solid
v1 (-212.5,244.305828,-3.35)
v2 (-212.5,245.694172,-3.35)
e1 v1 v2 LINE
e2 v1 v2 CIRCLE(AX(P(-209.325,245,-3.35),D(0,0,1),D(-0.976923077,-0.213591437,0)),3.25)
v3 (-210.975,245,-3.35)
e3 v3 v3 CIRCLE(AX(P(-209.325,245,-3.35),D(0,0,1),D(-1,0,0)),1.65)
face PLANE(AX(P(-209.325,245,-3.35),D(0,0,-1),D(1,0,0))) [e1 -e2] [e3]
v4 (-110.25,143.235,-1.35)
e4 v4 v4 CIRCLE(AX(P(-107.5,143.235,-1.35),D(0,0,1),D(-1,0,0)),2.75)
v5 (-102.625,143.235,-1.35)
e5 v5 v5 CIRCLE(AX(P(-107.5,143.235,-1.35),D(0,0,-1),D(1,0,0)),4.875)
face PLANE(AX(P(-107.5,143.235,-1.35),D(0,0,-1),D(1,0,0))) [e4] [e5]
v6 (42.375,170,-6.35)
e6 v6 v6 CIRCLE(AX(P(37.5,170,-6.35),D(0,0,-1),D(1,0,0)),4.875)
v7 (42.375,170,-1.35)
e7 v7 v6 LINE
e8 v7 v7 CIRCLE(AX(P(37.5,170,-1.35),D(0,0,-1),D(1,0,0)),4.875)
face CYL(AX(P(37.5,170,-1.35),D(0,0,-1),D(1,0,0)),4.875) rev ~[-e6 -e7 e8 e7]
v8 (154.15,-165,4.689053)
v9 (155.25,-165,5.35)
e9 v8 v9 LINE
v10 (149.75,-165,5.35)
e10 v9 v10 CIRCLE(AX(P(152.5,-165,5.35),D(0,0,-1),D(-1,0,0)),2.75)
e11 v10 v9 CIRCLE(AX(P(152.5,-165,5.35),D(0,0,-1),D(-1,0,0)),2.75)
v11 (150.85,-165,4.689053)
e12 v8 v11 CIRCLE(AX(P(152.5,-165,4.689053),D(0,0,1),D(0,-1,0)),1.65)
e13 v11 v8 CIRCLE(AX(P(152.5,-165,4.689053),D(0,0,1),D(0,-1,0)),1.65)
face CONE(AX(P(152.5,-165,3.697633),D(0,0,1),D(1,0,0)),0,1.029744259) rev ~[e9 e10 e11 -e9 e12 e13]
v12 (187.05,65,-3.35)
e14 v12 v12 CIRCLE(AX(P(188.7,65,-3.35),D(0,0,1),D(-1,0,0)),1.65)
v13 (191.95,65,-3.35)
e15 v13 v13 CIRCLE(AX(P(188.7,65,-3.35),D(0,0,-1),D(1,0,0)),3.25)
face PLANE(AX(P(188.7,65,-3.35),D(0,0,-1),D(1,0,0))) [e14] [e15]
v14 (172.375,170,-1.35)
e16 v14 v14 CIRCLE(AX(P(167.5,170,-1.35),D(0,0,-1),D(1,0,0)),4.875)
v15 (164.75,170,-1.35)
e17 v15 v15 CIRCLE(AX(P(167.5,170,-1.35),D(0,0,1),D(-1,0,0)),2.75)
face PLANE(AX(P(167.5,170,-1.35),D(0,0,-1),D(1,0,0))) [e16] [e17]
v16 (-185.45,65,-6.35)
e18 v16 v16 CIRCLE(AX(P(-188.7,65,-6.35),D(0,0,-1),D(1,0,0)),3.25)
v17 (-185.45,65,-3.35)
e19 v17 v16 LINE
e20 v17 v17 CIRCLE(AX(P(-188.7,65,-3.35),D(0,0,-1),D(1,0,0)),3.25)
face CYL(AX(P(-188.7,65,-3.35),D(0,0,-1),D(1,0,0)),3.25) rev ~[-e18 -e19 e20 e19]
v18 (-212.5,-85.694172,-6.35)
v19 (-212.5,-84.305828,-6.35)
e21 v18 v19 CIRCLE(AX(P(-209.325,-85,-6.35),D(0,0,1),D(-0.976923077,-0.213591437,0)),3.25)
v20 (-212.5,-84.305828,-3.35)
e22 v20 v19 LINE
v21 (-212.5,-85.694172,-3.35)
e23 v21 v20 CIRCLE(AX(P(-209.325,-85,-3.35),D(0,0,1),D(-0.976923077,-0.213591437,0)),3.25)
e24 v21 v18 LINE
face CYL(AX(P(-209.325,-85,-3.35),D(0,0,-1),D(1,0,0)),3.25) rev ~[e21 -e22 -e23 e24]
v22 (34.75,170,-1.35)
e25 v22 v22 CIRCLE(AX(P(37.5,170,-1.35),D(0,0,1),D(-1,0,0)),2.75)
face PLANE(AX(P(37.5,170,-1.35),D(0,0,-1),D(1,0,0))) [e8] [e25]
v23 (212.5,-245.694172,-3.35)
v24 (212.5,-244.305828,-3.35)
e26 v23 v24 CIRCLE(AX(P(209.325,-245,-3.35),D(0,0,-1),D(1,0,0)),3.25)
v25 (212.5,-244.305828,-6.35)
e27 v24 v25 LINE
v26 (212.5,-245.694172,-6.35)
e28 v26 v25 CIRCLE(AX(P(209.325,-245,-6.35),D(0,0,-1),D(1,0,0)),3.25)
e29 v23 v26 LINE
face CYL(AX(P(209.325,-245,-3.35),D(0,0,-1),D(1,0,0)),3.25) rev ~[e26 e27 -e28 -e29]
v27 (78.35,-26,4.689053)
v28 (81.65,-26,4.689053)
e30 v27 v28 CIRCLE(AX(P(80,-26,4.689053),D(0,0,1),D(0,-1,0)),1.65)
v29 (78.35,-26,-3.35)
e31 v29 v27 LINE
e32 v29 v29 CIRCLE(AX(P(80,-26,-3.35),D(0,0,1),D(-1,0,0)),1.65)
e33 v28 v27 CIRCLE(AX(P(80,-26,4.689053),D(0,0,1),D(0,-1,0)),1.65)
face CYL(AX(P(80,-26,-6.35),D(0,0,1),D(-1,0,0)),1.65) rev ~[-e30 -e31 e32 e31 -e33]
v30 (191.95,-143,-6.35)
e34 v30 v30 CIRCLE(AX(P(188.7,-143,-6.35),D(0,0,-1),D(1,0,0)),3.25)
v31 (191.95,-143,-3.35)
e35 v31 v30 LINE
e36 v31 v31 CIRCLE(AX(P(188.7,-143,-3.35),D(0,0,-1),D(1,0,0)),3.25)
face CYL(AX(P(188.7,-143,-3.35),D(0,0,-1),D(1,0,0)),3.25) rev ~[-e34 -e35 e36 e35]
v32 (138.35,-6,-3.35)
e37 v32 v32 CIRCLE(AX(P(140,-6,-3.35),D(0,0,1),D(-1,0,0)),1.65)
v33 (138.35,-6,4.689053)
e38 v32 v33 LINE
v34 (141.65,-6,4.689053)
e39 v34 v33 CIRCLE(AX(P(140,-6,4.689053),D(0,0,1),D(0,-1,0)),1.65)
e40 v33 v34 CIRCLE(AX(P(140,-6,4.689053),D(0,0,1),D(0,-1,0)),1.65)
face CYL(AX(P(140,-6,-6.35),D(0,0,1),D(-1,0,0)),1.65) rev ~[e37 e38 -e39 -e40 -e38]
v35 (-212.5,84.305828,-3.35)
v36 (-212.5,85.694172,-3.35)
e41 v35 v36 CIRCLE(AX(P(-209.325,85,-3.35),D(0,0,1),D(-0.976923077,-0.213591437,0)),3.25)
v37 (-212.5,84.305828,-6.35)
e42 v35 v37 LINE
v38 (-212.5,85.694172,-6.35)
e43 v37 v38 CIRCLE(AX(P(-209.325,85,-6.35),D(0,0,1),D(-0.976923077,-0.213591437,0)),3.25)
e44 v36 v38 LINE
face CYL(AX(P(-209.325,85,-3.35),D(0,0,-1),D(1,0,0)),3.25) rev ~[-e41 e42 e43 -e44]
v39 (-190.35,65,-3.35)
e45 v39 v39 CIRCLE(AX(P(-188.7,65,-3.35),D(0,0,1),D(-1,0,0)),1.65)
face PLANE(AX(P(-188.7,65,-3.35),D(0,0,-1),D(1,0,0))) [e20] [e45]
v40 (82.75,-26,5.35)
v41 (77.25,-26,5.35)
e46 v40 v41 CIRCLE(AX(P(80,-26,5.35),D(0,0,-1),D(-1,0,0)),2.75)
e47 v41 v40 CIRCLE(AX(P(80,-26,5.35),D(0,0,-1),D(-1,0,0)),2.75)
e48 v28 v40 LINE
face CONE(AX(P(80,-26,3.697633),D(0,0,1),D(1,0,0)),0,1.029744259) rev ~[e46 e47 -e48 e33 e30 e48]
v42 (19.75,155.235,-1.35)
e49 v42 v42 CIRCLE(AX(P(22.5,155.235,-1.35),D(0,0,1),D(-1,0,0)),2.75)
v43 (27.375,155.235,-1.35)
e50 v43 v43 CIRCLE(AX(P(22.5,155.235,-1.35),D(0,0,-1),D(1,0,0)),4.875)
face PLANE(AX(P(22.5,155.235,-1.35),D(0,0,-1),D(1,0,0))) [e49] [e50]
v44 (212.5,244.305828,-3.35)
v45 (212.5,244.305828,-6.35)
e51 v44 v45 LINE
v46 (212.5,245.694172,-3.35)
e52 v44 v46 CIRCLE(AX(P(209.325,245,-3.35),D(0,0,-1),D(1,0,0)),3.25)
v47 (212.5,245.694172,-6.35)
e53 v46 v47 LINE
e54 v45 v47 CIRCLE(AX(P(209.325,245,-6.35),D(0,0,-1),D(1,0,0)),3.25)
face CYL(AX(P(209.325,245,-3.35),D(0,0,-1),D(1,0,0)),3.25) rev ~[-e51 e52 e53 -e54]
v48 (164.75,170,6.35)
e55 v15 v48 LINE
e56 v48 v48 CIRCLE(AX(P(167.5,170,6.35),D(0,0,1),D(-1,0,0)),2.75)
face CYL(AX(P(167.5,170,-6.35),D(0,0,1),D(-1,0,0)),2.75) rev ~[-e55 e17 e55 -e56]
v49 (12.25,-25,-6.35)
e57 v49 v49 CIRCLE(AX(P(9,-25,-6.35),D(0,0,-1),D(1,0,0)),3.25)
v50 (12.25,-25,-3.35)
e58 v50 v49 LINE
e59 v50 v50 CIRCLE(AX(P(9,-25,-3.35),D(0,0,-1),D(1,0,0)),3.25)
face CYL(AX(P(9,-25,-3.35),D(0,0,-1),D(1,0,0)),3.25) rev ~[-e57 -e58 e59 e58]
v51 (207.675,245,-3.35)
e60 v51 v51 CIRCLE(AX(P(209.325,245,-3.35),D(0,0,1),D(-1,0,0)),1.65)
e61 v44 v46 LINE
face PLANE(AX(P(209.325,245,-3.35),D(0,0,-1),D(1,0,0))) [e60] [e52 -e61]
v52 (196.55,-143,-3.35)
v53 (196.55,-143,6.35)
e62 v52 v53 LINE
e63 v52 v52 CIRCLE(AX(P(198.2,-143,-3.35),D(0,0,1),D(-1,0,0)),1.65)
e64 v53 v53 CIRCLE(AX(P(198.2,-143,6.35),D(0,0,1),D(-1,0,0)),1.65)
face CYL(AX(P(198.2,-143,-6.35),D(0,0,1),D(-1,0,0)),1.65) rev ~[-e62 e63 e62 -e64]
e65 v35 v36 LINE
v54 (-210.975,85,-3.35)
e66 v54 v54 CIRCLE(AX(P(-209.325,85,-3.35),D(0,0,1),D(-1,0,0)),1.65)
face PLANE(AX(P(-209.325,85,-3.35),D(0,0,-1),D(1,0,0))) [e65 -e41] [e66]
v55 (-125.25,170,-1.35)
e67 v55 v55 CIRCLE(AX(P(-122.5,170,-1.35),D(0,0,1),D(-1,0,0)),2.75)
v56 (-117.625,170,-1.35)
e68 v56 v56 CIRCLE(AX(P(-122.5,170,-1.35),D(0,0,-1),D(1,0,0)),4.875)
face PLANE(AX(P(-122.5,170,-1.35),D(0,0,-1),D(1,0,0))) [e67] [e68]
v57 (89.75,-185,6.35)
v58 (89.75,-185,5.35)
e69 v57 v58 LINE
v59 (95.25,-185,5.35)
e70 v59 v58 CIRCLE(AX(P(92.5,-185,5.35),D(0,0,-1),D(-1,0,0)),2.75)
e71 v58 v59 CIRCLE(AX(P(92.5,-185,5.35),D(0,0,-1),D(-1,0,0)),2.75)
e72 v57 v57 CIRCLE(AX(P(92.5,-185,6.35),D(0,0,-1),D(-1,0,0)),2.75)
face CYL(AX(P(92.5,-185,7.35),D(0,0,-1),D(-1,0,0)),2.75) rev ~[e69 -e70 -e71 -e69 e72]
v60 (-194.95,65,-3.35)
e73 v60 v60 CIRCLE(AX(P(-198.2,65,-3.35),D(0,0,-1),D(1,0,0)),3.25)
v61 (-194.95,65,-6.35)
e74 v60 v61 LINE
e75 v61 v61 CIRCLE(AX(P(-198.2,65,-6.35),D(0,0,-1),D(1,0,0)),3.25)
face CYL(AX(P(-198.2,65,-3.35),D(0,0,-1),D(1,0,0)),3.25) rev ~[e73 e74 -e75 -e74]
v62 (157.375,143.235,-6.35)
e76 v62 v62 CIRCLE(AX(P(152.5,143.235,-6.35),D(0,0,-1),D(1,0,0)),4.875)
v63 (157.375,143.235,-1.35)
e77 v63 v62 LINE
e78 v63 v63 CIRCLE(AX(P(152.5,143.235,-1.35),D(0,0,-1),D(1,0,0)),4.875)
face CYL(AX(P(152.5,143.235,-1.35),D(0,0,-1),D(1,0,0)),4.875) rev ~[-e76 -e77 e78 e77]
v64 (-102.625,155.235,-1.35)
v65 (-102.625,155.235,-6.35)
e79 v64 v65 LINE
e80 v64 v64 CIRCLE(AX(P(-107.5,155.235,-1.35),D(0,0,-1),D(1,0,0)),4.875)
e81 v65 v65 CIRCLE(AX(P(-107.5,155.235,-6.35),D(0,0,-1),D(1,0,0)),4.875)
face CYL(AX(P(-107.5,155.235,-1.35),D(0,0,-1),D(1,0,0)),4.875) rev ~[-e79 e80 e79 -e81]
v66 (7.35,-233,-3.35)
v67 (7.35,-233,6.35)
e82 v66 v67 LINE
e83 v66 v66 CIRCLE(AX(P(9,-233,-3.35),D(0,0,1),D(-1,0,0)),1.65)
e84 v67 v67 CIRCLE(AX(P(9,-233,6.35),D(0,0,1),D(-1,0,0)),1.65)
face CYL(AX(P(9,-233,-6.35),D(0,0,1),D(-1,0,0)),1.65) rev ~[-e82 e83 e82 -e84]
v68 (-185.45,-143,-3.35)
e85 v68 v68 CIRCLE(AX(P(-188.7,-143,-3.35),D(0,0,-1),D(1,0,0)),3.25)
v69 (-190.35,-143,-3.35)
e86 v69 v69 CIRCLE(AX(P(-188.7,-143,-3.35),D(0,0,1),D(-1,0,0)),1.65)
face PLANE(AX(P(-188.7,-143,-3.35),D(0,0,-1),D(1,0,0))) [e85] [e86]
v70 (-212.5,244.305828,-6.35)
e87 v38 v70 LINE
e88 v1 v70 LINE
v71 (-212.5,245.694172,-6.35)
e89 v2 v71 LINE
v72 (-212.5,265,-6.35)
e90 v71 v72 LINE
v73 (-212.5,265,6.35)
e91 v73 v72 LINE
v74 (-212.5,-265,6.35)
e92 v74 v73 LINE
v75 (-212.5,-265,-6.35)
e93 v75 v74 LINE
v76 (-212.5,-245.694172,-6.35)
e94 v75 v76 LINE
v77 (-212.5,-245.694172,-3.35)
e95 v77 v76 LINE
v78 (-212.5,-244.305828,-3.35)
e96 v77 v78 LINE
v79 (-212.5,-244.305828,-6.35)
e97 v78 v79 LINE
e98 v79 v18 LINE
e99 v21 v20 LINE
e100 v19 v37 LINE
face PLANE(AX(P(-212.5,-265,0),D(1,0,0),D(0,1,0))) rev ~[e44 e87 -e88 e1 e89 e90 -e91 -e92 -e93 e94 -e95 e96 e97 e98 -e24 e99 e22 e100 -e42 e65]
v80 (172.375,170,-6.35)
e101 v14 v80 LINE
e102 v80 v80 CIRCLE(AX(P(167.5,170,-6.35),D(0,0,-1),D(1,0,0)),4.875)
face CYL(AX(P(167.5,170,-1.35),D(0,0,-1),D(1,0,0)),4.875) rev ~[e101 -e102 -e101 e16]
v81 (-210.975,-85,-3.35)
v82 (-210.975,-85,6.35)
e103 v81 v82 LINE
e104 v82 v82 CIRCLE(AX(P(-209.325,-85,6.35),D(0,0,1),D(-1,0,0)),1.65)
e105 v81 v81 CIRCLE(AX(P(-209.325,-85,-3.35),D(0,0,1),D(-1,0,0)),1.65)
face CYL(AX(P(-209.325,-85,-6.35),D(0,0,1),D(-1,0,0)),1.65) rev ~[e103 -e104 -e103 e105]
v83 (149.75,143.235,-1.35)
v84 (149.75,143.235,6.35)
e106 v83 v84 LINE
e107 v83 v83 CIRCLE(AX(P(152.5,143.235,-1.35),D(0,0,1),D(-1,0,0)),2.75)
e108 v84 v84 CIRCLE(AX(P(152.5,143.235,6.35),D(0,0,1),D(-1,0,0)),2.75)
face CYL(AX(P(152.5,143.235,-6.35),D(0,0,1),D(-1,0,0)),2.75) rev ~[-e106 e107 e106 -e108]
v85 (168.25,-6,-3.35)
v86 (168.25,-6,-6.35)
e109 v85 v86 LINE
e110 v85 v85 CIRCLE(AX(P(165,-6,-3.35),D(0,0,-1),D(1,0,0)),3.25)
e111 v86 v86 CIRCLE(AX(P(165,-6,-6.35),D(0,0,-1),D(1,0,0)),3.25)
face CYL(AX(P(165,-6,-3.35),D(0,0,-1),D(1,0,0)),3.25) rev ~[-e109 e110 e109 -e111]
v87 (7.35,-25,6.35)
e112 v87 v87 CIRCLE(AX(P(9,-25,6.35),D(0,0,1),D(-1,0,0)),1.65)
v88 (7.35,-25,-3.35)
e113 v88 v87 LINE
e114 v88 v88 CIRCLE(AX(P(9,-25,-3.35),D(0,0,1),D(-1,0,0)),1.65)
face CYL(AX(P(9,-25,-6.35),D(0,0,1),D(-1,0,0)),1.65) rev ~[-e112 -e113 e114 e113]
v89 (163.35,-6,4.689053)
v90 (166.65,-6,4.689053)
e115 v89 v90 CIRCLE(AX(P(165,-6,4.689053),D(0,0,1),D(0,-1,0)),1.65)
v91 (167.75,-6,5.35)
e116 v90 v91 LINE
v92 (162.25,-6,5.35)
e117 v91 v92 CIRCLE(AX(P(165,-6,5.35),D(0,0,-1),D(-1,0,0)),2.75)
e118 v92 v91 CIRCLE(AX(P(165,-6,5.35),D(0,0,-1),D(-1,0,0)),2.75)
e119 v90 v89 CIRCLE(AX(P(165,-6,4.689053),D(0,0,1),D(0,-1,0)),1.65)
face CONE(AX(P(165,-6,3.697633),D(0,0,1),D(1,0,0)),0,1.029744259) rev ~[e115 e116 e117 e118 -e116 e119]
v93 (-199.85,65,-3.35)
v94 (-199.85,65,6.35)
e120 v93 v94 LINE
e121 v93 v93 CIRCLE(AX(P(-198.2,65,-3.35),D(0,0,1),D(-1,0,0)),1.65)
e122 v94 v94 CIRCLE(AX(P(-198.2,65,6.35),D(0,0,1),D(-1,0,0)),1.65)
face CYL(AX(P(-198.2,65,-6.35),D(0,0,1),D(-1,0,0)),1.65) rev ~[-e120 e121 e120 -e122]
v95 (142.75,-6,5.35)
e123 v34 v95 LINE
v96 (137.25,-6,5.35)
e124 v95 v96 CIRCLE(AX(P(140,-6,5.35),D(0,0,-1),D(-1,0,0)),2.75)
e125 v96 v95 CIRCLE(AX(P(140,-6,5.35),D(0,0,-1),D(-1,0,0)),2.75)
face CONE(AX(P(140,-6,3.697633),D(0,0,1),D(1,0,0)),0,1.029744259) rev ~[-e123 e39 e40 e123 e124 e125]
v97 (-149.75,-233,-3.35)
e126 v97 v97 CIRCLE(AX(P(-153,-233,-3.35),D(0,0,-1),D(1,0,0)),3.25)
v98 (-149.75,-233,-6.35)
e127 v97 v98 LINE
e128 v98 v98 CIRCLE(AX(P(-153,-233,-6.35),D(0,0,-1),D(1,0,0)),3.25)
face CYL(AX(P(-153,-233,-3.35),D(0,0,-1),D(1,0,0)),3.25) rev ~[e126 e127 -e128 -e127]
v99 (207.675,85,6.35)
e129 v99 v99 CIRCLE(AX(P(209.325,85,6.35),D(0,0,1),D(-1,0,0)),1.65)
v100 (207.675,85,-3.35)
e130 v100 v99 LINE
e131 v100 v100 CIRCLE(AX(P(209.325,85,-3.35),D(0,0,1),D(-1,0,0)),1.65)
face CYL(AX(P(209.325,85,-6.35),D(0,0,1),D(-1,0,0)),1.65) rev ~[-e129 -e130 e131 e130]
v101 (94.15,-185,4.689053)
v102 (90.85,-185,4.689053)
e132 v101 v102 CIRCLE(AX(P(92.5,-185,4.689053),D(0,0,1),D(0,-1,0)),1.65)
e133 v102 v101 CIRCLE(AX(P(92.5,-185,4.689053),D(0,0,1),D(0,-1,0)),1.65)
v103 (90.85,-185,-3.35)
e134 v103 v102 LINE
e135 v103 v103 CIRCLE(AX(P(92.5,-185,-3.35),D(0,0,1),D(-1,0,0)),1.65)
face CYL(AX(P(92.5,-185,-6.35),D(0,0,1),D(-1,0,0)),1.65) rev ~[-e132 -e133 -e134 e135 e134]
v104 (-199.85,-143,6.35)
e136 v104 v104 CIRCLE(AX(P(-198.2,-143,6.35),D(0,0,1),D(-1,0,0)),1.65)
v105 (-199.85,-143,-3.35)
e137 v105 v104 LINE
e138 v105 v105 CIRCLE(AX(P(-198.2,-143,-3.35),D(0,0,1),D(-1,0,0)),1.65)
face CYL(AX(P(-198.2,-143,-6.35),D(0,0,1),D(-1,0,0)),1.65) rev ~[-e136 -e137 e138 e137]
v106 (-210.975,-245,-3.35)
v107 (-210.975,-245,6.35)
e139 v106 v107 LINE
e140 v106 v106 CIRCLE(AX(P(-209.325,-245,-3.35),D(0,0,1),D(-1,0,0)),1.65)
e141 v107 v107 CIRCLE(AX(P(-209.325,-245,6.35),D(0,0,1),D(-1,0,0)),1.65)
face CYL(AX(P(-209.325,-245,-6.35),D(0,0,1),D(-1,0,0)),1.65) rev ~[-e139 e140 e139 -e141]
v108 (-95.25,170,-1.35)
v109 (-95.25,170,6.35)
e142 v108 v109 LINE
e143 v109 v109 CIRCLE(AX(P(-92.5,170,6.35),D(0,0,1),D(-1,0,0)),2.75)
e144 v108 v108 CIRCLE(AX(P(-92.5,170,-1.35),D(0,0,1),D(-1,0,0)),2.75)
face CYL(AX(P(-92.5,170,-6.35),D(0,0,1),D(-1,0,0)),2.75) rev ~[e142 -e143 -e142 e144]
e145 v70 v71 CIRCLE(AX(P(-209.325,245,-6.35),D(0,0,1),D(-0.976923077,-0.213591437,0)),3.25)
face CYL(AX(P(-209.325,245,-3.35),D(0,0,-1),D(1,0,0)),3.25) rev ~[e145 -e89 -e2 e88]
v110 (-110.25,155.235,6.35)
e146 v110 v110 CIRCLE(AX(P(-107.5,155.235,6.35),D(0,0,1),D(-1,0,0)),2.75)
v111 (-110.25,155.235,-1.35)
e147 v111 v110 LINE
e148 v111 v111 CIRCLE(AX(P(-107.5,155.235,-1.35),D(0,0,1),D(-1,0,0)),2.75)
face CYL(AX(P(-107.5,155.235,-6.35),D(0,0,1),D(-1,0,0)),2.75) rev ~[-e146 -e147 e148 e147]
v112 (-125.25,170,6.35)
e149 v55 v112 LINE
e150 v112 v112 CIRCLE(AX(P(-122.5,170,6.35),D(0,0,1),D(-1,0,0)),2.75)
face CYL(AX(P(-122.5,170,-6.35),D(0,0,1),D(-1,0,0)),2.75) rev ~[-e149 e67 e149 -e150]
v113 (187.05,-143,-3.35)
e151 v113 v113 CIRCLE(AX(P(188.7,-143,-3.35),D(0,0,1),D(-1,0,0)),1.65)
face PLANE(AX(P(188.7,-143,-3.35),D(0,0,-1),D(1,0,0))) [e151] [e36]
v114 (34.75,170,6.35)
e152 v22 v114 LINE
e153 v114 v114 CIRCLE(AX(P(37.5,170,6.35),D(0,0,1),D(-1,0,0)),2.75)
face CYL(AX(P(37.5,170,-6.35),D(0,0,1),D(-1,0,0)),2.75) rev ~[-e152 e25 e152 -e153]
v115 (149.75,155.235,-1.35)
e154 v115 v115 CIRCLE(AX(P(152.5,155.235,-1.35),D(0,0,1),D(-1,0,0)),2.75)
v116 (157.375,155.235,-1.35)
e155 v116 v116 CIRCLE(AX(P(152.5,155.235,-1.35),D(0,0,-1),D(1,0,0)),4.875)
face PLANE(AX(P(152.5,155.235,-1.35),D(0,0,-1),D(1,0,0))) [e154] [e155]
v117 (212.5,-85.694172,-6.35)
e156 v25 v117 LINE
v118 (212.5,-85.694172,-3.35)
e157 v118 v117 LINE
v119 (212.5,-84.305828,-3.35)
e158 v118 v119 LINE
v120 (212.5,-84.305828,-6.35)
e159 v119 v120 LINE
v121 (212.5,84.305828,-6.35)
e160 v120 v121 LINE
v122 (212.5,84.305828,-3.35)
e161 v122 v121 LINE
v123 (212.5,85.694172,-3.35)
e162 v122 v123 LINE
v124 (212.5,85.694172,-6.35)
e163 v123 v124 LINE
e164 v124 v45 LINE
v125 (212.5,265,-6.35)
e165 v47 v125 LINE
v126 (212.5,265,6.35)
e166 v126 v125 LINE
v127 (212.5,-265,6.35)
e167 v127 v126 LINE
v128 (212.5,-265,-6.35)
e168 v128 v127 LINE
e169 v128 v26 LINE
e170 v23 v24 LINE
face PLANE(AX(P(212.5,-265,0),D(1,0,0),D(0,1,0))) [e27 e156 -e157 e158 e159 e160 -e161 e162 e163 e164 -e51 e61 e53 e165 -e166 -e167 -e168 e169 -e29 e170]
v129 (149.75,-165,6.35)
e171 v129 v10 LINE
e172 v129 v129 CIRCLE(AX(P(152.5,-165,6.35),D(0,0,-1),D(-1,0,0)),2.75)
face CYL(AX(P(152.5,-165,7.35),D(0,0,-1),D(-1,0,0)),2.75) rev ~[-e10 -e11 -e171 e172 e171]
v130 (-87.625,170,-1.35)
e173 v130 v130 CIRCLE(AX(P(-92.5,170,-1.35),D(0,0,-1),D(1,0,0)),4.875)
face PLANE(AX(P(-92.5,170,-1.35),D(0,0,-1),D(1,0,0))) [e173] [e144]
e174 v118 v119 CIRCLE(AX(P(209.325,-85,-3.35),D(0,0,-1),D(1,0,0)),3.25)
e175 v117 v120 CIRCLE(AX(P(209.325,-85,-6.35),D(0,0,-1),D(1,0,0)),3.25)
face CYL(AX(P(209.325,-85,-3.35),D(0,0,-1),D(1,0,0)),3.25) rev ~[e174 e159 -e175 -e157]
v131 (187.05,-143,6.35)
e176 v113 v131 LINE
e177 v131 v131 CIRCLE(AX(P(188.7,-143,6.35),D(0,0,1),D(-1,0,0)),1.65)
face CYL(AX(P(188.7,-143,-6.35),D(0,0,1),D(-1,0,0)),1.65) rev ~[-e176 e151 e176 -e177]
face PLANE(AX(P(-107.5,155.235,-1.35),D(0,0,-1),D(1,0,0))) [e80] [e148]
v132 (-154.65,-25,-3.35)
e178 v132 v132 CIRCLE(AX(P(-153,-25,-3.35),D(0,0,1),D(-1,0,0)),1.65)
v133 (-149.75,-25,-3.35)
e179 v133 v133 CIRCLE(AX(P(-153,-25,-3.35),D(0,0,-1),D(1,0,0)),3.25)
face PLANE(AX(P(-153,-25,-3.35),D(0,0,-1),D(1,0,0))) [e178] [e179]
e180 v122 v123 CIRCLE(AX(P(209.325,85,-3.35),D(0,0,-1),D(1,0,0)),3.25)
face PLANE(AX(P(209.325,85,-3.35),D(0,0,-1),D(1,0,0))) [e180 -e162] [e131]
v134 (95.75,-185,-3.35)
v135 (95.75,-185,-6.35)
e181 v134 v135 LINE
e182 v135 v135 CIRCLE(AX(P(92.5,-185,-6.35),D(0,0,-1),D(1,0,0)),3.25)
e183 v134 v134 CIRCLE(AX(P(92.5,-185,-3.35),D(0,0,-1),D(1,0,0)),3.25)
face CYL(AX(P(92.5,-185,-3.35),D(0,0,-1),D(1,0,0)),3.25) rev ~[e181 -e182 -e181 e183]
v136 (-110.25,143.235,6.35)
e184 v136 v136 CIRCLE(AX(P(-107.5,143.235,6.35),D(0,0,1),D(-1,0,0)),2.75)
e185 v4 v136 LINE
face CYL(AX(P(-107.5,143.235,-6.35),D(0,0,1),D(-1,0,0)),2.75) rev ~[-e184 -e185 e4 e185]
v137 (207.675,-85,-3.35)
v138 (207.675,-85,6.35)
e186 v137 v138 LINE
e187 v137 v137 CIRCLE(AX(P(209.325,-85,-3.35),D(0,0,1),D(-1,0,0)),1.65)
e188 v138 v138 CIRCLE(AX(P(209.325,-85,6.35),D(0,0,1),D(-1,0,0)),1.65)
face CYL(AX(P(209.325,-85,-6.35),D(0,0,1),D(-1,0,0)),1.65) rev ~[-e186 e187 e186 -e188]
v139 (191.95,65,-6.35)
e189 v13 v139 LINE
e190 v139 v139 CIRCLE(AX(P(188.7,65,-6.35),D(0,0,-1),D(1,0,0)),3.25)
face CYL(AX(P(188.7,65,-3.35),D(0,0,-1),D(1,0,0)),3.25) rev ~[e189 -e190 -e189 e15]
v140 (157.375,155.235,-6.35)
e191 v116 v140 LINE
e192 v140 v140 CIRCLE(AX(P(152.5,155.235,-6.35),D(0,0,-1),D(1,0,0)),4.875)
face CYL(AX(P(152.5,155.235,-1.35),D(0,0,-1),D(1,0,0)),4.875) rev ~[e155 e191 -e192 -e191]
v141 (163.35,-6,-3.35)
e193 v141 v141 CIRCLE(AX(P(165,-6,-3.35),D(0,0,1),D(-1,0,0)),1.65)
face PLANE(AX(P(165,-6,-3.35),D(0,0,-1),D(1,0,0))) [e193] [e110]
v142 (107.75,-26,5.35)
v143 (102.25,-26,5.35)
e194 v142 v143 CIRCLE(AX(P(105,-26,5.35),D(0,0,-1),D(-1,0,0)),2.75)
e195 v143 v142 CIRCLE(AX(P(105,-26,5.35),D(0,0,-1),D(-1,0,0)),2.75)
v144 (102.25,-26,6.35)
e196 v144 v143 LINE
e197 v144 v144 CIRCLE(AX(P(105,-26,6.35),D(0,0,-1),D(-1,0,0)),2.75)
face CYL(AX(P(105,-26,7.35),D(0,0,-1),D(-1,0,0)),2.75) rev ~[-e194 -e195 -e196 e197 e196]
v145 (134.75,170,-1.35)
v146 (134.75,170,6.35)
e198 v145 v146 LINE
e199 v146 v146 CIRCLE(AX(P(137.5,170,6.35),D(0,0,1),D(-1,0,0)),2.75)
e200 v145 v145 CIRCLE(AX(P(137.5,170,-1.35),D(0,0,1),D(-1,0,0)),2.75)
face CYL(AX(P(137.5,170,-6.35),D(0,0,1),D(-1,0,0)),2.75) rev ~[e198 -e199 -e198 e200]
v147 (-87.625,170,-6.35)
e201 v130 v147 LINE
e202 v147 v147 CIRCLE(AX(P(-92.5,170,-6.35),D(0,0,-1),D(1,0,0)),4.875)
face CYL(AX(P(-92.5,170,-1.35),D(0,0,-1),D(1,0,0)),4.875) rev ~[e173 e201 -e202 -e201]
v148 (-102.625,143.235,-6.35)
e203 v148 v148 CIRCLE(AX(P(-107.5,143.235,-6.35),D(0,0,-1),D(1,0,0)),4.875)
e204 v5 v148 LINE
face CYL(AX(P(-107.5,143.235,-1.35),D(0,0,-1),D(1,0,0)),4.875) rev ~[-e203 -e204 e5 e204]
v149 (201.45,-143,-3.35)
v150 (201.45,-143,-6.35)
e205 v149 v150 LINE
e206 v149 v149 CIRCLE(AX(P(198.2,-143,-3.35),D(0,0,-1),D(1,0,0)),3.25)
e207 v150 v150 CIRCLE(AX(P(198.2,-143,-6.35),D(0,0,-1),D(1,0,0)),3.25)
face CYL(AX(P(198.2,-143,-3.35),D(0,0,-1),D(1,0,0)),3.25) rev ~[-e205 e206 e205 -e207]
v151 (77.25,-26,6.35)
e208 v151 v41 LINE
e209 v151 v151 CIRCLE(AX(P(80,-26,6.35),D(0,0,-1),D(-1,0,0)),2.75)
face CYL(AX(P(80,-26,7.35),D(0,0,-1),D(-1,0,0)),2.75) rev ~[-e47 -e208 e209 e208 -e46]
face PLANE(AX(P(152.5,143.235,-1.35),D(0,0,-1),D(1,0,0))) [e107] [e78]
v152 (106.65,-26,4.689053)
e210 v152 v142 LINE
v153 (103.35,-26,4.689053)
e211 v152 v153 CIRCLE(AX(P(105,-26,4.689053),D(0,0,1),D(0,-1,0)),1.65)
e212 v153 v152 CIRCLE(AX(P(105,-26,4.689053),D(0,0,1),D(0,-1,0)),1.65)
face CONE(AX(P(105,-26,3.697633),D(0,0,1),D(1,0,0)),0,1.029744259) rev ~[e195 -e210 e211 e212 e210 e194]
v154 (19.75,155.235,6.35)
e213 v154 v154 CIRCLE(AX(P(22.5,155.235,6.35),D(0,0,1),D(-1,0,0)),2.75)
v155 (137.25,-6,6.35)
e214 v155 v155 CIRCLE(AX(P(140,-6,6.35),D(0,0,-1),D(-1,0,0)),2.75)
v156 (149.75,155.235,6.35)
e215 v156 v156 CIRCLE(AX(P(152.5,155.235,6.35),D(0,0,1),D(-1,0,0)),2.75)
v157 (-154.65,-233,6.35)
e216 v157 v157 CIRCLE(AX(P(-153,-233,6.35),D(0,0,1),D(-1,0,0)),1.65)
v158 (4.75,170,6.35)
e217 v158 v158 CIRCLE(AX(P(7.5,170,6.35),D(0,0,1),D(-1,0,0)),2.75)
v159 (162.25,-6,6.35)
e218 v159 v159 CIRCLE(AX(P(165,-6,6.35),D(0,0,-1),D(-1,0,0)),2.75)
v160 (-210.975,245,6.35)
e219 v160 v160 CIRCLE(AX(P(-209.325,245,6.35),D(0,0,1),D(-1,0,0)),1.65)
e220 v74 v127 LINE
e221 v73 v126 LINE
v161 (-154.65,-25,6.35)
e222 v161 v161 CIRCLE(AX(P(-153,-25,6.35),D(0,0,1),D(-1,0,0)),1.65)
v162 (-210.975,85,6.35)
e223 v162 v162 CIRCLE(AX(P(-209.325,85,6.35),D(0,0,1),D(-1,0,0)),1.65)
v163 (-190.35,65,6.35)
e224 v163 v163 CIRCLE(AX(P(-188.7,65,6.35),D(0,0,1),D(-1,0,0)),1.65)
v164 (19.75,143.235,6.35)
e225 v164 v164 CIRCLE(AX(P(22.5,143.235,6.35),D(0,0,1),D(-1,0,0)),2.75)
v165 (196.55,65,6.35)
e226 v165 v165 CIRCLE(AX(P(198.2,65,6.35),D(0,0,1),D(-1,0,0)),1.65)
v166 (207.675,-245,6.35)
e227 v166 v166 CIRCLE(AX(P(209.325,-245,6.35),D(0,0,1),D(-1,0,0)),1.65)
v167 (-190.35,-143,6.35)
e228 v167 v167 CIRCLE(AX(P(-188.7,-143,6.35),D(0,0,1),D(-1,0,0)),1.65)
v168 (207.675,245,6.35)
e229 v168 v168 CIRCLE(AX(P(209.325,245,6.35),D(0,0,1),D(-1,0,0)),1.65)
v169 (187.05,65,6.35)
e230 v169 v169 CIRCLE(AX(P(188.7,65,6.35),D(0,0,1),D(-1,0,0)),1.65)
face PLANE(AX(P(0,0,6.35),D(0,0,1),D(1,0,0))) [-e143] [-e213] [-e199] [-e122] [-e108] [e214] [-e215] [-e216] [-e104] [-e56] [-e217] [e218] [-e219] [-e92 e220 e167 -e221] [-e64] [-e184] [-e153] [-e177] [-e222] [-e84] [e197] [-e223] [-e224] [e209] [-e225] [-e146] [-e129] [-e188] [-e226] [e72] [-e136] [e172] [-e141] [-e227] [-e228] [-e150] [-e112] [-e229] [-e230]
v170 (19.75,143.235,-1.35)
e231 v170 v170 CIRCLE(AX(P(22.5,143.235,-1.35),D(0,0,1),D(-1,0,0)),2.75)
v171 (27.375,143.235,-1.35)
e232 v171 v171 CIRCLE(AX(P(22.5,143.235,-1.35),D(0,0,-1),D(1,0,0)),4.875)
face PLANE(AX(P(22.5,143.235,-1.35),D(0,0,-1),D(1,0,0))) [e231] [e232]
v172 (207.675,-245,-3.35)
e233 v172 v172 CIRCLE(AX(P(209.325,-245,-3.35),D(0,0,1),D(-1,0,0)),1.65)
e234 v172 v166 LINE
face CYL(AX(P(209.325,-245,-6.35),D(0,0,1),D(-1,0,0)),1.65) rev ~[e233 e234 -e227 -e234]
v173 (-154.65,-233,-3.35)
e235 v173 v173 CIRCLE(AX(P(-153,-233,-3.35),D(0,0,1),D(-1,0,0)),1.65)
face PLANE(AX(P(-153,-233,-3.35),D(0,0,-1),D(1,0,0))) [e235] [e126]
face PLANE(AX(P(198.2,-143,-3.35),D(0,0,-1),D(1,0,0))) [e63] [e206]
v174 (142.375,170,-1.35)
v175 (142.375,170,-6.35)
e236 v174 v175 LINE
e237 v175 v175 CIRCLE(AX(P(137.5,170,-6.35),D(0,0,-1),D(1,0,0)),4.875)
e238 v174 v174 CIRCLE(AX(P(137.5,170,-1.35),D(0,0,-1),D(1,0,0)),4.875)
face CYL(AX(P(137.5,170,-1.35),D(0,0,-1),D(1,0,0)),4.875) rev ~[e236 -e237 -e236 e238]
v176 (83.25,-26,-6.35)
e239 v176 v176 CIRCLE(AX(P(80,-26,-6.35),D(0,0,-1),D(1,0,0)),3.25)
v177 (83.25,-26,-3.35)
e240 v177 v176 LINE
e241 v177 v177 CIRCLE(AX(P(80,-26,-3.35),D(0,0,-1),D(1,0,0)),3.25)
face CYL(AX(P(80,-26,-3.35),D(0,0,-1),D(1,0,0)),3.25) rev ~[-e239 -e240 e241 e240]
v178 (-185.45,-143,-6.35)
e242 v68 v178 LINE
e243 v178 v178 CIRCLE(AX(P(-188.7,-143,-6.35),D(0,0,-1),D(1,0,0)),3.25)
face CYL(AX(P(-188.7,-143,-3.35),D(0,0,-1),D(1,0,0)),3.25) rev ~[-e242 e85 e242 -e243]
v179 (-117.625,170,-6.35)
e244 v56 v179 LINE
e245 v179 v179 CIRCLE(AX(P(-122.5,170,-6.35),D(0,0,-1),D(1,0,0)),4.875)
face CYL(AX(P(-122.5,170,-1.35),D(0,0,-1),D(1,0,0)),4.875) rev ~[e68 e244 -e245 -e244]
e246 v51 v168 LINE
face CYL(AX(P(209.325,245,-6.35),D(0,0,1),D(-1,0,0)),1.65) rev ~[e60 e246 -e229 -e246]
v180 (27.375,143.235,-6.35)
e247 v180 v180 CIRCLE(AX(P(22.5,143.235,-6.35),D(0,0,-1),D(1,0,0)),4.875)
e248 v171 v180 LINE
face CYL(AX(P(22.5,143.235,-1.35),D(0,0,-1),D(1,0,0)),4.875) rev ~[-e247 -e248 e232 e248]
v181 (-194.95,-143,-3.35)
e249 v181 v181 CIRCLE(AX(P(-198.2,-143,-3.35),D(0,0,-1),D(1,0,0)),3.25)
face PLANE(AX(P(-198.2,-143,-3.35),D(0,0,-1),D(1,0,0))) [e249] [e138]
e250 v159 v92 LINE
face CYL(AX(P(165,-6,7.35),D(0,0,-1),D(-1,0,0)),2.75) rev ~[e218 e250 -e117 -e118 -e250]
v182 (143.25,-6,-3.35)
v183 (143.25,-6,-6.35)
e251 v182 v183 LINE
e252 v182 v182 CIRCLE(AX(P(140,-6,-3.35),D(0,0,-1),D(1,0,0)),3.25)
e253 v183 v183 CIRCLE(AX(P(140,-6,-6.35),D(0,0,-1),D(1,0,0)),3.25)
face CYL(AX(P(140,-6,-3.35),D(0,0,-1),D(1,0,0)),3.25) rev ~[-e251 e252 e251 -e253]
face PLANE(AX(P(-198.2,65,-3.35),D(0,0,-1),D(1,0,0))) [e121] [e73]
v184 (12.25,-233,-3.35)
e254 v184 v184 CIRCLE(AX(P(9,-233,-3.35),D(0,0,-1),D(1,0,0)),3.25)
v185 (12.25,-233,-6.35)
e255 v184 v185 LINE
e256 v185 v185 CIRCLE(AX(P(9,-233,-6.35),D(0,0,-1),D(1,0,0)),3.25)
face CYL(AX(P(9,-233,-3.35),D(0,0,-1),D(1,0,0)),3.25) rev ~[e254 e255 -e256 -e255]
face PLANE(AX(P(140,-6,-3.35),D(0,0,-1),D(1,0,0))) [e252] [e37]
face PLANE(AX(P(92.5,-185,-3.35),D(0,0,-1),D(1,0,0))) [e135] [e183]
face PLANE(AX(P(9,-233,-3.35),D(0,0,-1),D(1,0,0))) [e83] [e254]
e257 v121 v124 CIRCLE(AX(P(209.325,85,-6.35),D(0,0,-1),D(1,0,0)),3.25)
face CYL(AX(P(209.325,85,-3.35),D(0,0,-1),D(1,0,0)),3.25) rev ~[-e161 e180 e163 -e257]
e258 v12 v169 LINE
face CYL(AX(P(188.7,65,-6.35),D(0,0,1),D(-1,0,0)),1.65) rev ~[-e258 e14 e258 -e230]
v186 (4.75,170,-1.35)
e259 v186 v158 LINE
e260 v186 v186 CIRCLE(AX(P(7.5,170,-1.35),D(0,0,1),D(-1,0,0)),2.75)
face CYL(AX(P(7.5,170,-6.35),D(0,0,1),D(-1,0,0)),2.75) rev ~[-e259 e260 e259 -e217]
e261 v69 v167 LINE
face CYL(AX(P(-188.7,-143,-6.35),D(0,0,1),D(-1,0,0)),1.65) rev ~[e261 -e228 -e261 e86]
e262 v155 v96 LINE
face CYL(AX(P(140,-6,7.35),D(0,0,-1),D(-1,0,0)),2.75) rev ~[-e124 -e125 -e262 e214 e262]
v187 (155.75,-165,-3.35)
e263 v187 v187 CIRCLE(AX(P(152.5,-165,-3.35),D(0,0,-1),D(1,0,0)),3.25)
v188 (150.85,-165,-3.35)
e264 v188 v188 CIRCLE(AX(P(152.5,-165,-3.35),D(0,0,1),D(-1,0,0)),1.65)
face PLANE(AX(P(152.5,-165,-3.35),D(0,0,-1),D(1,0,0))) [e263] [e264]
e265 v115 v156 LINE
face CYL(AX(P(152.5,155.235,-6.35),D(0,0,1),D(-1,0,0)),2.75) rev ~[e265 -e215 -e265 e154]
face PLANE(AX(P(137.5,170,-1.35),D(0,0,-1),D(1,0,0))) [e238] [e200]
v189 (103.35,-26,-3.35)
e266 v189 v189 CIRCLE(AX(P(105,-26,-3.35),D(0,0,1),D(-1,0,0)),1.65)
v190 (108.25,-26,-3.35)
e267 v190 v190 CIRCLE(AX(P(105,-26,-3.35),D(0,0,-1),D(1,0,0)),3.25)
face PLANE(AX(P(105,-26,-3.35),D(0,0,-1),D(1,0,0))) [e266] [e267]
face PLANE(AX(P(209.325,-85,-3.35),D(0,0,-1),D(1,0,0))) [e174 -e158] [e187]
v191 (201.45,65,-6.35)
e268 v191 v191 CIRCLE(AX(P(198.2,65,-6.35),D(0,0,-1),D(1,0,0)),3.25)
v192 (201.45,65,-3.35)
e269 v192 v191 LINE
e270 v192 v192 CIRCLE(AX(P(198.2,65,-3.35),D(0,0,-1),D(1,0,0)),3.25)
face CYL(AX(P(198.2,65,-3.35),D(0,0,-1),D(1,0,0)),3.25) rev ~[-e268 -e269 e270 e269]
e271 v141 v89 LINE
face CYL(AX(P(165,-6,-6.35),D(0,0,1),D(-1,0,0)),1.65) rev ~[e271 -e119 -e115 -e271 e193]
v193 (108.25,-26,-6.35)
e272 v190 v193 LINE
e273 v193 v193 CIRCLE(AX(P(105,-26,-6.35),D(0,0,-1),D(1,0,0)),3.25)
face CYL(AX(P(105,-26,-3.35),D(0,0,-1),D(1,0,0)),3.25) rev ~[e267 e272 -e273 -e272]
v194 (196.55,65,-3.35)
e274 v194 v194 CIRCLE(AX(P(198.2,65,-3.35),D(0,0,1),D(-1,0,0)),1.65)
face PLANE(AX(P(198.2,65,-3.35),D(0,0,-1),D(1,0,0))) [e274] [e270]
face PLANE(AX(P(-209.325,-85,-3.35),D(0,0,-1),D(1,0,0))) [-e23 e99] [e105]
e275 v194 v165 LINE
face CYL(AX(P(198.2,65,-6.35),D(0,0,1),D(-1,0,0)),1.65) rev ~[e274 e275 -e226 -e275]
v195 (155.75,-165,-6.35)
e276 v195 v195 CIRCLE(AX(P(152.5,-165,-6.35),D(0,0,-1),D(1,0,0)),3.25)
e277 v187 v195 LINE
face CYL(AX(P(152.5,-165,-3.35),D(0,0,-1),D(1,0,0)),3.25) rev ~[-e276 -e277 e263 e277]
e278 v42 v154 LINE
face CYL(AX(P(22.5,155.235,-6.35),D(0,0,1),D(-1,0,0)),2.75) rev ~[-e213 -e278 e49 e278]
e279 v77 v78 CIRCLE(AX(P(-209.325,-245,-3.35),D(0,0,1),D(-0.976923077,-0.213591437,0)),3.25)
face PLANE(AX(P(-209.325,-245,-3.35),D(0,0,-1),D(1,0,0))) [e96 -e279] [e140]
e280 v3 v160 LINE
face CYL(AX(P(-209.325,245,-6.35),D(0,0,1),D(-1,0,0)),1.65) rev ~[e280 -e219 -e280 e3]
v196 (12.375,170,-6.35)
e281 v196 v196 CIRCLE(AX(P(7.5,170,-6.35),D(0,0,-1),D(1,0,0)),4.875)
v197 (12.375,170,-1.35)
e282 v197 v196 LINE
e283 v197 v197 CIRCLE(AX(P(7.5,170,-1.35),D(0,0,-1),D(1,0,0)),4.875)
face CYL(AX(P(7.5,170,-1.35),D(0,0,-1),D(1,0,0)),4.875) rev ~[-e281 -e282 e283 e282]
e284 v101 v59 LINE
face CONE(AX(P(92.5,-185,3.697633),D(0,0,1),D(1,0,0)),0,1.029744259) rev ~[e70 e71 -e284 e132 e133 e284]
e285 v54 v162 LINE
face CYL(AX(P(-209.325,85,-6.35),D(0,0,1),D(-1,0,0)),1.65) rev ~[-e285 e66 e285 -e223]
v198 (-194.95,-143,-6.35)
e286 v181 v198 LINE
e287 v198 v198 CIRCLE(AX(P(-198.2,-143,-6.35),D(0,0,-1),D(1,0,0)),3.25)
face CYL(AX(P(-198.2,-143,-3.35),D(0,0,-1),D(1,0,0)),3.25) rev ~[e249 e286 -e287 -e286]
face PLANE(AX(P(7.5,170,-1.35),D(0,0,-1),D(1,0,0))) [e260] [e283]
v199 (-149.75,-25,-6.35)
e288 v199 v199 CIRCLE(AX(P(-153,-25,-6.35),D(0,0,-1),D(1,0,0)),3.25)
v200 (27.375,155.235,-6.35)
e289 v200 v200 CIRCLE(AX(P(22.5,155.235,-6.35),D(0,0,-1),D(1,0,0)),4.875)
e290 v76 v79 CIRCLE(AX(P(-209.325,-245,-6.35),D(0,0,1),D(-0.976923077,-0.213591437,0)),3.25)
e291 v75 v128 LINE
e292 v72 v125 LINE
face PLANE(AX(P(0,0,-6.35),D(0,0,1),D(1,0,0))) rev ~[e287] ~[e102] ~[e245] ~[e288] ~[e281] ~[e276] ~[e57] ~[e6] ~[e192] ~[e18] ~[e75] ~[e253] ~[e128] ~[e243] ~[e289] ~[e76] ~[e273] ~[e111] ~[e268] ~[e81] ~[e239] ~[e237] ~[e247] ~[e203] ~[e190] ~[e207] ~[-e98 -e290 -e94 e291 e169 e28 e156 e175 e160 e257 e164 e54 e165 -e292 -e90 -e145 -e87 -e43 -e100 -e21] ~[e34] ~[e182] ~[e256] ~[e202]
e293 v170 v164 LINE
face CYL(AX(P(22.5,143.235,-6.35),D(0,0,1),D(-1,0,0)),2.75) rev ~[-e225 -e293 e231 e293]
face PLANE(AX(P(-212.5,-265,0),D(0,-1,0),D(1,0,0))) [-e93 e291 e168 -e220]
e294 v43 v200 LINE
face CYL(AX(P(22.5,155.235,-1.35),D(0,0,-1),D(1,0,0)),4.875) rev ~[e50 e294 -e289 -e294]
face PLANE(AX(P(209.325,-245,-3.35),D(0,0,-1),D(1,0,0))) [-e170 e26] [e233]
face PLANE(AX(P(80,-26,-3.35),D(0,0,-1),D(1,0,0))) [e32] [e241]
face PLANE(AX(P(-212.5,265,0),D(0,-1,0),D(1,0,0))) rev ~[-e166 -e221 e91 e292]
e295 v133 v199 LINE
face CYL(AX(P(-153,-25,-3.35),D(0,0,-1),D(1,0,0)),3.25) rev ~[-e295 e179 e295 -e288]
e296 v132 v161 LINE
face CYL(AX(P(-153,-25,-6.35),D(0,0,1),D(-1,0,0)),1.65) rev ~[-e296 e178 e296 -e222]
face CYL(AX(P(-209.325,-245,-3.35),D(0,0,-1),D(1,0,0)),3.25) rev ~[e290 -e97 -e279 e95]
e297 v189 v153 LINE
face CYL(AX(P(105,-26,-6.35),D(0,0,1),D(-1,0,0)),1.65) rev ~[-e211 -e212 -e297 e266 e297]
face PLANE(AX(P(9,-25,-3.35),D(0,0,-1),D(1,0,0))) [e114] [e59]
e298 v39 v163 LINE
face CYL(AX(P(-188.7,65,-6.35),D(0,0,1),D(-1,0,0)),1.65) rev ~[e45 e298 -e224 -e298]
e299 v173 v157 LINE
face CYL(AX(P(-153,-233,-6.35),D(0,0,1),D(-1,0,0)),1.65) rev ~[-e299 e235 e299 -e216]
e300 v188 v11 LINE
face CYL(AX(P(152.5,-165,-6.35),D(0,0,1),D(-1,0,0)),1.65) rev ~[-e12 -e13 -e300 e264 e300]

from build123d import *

# Parameters (mm, degrees)
F0_W            = 425
F0_H            = 530
F1_DEPTH        = 6.35
F3_D            = 3.3
F3_CBORE_D      = 6.5
F3_CBORE_DEPTH  = 3
F5_D            = 5.5
F5_CBORE_D      = 9.75
F5_CBORE_DEPTH  = 5
F7_D            = 3.3
F7_CBORE_D      = 6.5
F7_CBORE_DEPTH  = 3
F9_D            = 5.5
F9_DEPTH        = 1
F9_TIP          = 1.6523667023
F11_D           = 3.3
F11_CBORE_D     = 6.5
F11_CBORE_DEPTH = 3


# Not quite as in the source:
# - a feature names something its author has since deleted; it is built from what else it names


with BuildPart() as f1:
    # F0 (on Top) → F1 (new body, symmetric)
    with BuildSketch(Plane.XY):
        Rectangle(F0_W, F0_H)
    extrude(amount=F1_DEPTH, both=True)

    # F3 (through all)
    with Locations(Plane(origin=(0, 0, -6.35), x_dir=(1, 0, 0), z_dir=(0, 0, -1))):
        with Locations((-209.325, 245), (-209.325, 85), (-209.325, -85), (-209.325, -245), (209.325, -245), (209.325, -85), (209.325, 85), (209.325, 245), (-198.2, 143), (-188.7, 143), (198.2, 143), (188.7, 143), (-198.2, -65), (-188.7, -65), (188.7, -65), (198.2, -65)):
            CounterBoreHole(F3_D / 2, F3_CBORE_D / 2, F3_CBORE_DEPTH)

    # F5 (through all)
    with Locations(Plane(origin=(0, 0, -6.35), x_dir=(1, 0, 0), z_dir=(0, 0, -1))):
        with Locations((-122.5, -170), (-92.5, -170), (-107.5, -155.235), (-107.5, -143.235), (167.5, -170), (152.5, -155.235), (152.5, -143.235), (137.5, -170), (37.5, -170), (7.5, -170), (22.5, -155.235), (22.5, -143.235)):
            CounterBoreHole(F5_D / 2, F5_CBORE_D / 2, F5_CBORE_DEPTH)

    # F7 (through all)
    with Locations(Plane(origin=(0, 0, -6.35), x_dir=(1, 0, 0), z_dir=(0, 0, -1))):
        with Locations((152.5, 165), (165, 6), (140, 6), (92.5, 185), (105, 26), (80, 26)):
            CounterBoreHole(F7_D / 2, F7_CBORE_D / 2, F7_CBORE_DEPTH)

    # F9
    with Locations(Plane.XY.offset(6.35)):
        with Locations((165, -6), (140, -6), (105, -26), (105, -26), (80, -26), (152.5, -165), (92.5, -185)):
            Hole(F9_D / 2, depth=F9_DEPTH)
            with Locations((0, 0, -(F9_DEPTH + F9_TIP / 2))):  # 118° drill point
                Cone(0, F9_D / 2, F9_TIP, mode=Mode.SUBTRACT)

    # F11 (through all)
    with Locations(Plane(origin=(0, 0, -6.35), x_dir=(1, 0, 0), z_dir=(0, 0, -1))):
        with Locations((-153, 233), (9, 233), (9, 25), (-153, 25)):
            CounterBoreHole(F11_D / 2, F11_CBORE_D / 2, F11_CBORE_DEPTH)


solid = f1.part
